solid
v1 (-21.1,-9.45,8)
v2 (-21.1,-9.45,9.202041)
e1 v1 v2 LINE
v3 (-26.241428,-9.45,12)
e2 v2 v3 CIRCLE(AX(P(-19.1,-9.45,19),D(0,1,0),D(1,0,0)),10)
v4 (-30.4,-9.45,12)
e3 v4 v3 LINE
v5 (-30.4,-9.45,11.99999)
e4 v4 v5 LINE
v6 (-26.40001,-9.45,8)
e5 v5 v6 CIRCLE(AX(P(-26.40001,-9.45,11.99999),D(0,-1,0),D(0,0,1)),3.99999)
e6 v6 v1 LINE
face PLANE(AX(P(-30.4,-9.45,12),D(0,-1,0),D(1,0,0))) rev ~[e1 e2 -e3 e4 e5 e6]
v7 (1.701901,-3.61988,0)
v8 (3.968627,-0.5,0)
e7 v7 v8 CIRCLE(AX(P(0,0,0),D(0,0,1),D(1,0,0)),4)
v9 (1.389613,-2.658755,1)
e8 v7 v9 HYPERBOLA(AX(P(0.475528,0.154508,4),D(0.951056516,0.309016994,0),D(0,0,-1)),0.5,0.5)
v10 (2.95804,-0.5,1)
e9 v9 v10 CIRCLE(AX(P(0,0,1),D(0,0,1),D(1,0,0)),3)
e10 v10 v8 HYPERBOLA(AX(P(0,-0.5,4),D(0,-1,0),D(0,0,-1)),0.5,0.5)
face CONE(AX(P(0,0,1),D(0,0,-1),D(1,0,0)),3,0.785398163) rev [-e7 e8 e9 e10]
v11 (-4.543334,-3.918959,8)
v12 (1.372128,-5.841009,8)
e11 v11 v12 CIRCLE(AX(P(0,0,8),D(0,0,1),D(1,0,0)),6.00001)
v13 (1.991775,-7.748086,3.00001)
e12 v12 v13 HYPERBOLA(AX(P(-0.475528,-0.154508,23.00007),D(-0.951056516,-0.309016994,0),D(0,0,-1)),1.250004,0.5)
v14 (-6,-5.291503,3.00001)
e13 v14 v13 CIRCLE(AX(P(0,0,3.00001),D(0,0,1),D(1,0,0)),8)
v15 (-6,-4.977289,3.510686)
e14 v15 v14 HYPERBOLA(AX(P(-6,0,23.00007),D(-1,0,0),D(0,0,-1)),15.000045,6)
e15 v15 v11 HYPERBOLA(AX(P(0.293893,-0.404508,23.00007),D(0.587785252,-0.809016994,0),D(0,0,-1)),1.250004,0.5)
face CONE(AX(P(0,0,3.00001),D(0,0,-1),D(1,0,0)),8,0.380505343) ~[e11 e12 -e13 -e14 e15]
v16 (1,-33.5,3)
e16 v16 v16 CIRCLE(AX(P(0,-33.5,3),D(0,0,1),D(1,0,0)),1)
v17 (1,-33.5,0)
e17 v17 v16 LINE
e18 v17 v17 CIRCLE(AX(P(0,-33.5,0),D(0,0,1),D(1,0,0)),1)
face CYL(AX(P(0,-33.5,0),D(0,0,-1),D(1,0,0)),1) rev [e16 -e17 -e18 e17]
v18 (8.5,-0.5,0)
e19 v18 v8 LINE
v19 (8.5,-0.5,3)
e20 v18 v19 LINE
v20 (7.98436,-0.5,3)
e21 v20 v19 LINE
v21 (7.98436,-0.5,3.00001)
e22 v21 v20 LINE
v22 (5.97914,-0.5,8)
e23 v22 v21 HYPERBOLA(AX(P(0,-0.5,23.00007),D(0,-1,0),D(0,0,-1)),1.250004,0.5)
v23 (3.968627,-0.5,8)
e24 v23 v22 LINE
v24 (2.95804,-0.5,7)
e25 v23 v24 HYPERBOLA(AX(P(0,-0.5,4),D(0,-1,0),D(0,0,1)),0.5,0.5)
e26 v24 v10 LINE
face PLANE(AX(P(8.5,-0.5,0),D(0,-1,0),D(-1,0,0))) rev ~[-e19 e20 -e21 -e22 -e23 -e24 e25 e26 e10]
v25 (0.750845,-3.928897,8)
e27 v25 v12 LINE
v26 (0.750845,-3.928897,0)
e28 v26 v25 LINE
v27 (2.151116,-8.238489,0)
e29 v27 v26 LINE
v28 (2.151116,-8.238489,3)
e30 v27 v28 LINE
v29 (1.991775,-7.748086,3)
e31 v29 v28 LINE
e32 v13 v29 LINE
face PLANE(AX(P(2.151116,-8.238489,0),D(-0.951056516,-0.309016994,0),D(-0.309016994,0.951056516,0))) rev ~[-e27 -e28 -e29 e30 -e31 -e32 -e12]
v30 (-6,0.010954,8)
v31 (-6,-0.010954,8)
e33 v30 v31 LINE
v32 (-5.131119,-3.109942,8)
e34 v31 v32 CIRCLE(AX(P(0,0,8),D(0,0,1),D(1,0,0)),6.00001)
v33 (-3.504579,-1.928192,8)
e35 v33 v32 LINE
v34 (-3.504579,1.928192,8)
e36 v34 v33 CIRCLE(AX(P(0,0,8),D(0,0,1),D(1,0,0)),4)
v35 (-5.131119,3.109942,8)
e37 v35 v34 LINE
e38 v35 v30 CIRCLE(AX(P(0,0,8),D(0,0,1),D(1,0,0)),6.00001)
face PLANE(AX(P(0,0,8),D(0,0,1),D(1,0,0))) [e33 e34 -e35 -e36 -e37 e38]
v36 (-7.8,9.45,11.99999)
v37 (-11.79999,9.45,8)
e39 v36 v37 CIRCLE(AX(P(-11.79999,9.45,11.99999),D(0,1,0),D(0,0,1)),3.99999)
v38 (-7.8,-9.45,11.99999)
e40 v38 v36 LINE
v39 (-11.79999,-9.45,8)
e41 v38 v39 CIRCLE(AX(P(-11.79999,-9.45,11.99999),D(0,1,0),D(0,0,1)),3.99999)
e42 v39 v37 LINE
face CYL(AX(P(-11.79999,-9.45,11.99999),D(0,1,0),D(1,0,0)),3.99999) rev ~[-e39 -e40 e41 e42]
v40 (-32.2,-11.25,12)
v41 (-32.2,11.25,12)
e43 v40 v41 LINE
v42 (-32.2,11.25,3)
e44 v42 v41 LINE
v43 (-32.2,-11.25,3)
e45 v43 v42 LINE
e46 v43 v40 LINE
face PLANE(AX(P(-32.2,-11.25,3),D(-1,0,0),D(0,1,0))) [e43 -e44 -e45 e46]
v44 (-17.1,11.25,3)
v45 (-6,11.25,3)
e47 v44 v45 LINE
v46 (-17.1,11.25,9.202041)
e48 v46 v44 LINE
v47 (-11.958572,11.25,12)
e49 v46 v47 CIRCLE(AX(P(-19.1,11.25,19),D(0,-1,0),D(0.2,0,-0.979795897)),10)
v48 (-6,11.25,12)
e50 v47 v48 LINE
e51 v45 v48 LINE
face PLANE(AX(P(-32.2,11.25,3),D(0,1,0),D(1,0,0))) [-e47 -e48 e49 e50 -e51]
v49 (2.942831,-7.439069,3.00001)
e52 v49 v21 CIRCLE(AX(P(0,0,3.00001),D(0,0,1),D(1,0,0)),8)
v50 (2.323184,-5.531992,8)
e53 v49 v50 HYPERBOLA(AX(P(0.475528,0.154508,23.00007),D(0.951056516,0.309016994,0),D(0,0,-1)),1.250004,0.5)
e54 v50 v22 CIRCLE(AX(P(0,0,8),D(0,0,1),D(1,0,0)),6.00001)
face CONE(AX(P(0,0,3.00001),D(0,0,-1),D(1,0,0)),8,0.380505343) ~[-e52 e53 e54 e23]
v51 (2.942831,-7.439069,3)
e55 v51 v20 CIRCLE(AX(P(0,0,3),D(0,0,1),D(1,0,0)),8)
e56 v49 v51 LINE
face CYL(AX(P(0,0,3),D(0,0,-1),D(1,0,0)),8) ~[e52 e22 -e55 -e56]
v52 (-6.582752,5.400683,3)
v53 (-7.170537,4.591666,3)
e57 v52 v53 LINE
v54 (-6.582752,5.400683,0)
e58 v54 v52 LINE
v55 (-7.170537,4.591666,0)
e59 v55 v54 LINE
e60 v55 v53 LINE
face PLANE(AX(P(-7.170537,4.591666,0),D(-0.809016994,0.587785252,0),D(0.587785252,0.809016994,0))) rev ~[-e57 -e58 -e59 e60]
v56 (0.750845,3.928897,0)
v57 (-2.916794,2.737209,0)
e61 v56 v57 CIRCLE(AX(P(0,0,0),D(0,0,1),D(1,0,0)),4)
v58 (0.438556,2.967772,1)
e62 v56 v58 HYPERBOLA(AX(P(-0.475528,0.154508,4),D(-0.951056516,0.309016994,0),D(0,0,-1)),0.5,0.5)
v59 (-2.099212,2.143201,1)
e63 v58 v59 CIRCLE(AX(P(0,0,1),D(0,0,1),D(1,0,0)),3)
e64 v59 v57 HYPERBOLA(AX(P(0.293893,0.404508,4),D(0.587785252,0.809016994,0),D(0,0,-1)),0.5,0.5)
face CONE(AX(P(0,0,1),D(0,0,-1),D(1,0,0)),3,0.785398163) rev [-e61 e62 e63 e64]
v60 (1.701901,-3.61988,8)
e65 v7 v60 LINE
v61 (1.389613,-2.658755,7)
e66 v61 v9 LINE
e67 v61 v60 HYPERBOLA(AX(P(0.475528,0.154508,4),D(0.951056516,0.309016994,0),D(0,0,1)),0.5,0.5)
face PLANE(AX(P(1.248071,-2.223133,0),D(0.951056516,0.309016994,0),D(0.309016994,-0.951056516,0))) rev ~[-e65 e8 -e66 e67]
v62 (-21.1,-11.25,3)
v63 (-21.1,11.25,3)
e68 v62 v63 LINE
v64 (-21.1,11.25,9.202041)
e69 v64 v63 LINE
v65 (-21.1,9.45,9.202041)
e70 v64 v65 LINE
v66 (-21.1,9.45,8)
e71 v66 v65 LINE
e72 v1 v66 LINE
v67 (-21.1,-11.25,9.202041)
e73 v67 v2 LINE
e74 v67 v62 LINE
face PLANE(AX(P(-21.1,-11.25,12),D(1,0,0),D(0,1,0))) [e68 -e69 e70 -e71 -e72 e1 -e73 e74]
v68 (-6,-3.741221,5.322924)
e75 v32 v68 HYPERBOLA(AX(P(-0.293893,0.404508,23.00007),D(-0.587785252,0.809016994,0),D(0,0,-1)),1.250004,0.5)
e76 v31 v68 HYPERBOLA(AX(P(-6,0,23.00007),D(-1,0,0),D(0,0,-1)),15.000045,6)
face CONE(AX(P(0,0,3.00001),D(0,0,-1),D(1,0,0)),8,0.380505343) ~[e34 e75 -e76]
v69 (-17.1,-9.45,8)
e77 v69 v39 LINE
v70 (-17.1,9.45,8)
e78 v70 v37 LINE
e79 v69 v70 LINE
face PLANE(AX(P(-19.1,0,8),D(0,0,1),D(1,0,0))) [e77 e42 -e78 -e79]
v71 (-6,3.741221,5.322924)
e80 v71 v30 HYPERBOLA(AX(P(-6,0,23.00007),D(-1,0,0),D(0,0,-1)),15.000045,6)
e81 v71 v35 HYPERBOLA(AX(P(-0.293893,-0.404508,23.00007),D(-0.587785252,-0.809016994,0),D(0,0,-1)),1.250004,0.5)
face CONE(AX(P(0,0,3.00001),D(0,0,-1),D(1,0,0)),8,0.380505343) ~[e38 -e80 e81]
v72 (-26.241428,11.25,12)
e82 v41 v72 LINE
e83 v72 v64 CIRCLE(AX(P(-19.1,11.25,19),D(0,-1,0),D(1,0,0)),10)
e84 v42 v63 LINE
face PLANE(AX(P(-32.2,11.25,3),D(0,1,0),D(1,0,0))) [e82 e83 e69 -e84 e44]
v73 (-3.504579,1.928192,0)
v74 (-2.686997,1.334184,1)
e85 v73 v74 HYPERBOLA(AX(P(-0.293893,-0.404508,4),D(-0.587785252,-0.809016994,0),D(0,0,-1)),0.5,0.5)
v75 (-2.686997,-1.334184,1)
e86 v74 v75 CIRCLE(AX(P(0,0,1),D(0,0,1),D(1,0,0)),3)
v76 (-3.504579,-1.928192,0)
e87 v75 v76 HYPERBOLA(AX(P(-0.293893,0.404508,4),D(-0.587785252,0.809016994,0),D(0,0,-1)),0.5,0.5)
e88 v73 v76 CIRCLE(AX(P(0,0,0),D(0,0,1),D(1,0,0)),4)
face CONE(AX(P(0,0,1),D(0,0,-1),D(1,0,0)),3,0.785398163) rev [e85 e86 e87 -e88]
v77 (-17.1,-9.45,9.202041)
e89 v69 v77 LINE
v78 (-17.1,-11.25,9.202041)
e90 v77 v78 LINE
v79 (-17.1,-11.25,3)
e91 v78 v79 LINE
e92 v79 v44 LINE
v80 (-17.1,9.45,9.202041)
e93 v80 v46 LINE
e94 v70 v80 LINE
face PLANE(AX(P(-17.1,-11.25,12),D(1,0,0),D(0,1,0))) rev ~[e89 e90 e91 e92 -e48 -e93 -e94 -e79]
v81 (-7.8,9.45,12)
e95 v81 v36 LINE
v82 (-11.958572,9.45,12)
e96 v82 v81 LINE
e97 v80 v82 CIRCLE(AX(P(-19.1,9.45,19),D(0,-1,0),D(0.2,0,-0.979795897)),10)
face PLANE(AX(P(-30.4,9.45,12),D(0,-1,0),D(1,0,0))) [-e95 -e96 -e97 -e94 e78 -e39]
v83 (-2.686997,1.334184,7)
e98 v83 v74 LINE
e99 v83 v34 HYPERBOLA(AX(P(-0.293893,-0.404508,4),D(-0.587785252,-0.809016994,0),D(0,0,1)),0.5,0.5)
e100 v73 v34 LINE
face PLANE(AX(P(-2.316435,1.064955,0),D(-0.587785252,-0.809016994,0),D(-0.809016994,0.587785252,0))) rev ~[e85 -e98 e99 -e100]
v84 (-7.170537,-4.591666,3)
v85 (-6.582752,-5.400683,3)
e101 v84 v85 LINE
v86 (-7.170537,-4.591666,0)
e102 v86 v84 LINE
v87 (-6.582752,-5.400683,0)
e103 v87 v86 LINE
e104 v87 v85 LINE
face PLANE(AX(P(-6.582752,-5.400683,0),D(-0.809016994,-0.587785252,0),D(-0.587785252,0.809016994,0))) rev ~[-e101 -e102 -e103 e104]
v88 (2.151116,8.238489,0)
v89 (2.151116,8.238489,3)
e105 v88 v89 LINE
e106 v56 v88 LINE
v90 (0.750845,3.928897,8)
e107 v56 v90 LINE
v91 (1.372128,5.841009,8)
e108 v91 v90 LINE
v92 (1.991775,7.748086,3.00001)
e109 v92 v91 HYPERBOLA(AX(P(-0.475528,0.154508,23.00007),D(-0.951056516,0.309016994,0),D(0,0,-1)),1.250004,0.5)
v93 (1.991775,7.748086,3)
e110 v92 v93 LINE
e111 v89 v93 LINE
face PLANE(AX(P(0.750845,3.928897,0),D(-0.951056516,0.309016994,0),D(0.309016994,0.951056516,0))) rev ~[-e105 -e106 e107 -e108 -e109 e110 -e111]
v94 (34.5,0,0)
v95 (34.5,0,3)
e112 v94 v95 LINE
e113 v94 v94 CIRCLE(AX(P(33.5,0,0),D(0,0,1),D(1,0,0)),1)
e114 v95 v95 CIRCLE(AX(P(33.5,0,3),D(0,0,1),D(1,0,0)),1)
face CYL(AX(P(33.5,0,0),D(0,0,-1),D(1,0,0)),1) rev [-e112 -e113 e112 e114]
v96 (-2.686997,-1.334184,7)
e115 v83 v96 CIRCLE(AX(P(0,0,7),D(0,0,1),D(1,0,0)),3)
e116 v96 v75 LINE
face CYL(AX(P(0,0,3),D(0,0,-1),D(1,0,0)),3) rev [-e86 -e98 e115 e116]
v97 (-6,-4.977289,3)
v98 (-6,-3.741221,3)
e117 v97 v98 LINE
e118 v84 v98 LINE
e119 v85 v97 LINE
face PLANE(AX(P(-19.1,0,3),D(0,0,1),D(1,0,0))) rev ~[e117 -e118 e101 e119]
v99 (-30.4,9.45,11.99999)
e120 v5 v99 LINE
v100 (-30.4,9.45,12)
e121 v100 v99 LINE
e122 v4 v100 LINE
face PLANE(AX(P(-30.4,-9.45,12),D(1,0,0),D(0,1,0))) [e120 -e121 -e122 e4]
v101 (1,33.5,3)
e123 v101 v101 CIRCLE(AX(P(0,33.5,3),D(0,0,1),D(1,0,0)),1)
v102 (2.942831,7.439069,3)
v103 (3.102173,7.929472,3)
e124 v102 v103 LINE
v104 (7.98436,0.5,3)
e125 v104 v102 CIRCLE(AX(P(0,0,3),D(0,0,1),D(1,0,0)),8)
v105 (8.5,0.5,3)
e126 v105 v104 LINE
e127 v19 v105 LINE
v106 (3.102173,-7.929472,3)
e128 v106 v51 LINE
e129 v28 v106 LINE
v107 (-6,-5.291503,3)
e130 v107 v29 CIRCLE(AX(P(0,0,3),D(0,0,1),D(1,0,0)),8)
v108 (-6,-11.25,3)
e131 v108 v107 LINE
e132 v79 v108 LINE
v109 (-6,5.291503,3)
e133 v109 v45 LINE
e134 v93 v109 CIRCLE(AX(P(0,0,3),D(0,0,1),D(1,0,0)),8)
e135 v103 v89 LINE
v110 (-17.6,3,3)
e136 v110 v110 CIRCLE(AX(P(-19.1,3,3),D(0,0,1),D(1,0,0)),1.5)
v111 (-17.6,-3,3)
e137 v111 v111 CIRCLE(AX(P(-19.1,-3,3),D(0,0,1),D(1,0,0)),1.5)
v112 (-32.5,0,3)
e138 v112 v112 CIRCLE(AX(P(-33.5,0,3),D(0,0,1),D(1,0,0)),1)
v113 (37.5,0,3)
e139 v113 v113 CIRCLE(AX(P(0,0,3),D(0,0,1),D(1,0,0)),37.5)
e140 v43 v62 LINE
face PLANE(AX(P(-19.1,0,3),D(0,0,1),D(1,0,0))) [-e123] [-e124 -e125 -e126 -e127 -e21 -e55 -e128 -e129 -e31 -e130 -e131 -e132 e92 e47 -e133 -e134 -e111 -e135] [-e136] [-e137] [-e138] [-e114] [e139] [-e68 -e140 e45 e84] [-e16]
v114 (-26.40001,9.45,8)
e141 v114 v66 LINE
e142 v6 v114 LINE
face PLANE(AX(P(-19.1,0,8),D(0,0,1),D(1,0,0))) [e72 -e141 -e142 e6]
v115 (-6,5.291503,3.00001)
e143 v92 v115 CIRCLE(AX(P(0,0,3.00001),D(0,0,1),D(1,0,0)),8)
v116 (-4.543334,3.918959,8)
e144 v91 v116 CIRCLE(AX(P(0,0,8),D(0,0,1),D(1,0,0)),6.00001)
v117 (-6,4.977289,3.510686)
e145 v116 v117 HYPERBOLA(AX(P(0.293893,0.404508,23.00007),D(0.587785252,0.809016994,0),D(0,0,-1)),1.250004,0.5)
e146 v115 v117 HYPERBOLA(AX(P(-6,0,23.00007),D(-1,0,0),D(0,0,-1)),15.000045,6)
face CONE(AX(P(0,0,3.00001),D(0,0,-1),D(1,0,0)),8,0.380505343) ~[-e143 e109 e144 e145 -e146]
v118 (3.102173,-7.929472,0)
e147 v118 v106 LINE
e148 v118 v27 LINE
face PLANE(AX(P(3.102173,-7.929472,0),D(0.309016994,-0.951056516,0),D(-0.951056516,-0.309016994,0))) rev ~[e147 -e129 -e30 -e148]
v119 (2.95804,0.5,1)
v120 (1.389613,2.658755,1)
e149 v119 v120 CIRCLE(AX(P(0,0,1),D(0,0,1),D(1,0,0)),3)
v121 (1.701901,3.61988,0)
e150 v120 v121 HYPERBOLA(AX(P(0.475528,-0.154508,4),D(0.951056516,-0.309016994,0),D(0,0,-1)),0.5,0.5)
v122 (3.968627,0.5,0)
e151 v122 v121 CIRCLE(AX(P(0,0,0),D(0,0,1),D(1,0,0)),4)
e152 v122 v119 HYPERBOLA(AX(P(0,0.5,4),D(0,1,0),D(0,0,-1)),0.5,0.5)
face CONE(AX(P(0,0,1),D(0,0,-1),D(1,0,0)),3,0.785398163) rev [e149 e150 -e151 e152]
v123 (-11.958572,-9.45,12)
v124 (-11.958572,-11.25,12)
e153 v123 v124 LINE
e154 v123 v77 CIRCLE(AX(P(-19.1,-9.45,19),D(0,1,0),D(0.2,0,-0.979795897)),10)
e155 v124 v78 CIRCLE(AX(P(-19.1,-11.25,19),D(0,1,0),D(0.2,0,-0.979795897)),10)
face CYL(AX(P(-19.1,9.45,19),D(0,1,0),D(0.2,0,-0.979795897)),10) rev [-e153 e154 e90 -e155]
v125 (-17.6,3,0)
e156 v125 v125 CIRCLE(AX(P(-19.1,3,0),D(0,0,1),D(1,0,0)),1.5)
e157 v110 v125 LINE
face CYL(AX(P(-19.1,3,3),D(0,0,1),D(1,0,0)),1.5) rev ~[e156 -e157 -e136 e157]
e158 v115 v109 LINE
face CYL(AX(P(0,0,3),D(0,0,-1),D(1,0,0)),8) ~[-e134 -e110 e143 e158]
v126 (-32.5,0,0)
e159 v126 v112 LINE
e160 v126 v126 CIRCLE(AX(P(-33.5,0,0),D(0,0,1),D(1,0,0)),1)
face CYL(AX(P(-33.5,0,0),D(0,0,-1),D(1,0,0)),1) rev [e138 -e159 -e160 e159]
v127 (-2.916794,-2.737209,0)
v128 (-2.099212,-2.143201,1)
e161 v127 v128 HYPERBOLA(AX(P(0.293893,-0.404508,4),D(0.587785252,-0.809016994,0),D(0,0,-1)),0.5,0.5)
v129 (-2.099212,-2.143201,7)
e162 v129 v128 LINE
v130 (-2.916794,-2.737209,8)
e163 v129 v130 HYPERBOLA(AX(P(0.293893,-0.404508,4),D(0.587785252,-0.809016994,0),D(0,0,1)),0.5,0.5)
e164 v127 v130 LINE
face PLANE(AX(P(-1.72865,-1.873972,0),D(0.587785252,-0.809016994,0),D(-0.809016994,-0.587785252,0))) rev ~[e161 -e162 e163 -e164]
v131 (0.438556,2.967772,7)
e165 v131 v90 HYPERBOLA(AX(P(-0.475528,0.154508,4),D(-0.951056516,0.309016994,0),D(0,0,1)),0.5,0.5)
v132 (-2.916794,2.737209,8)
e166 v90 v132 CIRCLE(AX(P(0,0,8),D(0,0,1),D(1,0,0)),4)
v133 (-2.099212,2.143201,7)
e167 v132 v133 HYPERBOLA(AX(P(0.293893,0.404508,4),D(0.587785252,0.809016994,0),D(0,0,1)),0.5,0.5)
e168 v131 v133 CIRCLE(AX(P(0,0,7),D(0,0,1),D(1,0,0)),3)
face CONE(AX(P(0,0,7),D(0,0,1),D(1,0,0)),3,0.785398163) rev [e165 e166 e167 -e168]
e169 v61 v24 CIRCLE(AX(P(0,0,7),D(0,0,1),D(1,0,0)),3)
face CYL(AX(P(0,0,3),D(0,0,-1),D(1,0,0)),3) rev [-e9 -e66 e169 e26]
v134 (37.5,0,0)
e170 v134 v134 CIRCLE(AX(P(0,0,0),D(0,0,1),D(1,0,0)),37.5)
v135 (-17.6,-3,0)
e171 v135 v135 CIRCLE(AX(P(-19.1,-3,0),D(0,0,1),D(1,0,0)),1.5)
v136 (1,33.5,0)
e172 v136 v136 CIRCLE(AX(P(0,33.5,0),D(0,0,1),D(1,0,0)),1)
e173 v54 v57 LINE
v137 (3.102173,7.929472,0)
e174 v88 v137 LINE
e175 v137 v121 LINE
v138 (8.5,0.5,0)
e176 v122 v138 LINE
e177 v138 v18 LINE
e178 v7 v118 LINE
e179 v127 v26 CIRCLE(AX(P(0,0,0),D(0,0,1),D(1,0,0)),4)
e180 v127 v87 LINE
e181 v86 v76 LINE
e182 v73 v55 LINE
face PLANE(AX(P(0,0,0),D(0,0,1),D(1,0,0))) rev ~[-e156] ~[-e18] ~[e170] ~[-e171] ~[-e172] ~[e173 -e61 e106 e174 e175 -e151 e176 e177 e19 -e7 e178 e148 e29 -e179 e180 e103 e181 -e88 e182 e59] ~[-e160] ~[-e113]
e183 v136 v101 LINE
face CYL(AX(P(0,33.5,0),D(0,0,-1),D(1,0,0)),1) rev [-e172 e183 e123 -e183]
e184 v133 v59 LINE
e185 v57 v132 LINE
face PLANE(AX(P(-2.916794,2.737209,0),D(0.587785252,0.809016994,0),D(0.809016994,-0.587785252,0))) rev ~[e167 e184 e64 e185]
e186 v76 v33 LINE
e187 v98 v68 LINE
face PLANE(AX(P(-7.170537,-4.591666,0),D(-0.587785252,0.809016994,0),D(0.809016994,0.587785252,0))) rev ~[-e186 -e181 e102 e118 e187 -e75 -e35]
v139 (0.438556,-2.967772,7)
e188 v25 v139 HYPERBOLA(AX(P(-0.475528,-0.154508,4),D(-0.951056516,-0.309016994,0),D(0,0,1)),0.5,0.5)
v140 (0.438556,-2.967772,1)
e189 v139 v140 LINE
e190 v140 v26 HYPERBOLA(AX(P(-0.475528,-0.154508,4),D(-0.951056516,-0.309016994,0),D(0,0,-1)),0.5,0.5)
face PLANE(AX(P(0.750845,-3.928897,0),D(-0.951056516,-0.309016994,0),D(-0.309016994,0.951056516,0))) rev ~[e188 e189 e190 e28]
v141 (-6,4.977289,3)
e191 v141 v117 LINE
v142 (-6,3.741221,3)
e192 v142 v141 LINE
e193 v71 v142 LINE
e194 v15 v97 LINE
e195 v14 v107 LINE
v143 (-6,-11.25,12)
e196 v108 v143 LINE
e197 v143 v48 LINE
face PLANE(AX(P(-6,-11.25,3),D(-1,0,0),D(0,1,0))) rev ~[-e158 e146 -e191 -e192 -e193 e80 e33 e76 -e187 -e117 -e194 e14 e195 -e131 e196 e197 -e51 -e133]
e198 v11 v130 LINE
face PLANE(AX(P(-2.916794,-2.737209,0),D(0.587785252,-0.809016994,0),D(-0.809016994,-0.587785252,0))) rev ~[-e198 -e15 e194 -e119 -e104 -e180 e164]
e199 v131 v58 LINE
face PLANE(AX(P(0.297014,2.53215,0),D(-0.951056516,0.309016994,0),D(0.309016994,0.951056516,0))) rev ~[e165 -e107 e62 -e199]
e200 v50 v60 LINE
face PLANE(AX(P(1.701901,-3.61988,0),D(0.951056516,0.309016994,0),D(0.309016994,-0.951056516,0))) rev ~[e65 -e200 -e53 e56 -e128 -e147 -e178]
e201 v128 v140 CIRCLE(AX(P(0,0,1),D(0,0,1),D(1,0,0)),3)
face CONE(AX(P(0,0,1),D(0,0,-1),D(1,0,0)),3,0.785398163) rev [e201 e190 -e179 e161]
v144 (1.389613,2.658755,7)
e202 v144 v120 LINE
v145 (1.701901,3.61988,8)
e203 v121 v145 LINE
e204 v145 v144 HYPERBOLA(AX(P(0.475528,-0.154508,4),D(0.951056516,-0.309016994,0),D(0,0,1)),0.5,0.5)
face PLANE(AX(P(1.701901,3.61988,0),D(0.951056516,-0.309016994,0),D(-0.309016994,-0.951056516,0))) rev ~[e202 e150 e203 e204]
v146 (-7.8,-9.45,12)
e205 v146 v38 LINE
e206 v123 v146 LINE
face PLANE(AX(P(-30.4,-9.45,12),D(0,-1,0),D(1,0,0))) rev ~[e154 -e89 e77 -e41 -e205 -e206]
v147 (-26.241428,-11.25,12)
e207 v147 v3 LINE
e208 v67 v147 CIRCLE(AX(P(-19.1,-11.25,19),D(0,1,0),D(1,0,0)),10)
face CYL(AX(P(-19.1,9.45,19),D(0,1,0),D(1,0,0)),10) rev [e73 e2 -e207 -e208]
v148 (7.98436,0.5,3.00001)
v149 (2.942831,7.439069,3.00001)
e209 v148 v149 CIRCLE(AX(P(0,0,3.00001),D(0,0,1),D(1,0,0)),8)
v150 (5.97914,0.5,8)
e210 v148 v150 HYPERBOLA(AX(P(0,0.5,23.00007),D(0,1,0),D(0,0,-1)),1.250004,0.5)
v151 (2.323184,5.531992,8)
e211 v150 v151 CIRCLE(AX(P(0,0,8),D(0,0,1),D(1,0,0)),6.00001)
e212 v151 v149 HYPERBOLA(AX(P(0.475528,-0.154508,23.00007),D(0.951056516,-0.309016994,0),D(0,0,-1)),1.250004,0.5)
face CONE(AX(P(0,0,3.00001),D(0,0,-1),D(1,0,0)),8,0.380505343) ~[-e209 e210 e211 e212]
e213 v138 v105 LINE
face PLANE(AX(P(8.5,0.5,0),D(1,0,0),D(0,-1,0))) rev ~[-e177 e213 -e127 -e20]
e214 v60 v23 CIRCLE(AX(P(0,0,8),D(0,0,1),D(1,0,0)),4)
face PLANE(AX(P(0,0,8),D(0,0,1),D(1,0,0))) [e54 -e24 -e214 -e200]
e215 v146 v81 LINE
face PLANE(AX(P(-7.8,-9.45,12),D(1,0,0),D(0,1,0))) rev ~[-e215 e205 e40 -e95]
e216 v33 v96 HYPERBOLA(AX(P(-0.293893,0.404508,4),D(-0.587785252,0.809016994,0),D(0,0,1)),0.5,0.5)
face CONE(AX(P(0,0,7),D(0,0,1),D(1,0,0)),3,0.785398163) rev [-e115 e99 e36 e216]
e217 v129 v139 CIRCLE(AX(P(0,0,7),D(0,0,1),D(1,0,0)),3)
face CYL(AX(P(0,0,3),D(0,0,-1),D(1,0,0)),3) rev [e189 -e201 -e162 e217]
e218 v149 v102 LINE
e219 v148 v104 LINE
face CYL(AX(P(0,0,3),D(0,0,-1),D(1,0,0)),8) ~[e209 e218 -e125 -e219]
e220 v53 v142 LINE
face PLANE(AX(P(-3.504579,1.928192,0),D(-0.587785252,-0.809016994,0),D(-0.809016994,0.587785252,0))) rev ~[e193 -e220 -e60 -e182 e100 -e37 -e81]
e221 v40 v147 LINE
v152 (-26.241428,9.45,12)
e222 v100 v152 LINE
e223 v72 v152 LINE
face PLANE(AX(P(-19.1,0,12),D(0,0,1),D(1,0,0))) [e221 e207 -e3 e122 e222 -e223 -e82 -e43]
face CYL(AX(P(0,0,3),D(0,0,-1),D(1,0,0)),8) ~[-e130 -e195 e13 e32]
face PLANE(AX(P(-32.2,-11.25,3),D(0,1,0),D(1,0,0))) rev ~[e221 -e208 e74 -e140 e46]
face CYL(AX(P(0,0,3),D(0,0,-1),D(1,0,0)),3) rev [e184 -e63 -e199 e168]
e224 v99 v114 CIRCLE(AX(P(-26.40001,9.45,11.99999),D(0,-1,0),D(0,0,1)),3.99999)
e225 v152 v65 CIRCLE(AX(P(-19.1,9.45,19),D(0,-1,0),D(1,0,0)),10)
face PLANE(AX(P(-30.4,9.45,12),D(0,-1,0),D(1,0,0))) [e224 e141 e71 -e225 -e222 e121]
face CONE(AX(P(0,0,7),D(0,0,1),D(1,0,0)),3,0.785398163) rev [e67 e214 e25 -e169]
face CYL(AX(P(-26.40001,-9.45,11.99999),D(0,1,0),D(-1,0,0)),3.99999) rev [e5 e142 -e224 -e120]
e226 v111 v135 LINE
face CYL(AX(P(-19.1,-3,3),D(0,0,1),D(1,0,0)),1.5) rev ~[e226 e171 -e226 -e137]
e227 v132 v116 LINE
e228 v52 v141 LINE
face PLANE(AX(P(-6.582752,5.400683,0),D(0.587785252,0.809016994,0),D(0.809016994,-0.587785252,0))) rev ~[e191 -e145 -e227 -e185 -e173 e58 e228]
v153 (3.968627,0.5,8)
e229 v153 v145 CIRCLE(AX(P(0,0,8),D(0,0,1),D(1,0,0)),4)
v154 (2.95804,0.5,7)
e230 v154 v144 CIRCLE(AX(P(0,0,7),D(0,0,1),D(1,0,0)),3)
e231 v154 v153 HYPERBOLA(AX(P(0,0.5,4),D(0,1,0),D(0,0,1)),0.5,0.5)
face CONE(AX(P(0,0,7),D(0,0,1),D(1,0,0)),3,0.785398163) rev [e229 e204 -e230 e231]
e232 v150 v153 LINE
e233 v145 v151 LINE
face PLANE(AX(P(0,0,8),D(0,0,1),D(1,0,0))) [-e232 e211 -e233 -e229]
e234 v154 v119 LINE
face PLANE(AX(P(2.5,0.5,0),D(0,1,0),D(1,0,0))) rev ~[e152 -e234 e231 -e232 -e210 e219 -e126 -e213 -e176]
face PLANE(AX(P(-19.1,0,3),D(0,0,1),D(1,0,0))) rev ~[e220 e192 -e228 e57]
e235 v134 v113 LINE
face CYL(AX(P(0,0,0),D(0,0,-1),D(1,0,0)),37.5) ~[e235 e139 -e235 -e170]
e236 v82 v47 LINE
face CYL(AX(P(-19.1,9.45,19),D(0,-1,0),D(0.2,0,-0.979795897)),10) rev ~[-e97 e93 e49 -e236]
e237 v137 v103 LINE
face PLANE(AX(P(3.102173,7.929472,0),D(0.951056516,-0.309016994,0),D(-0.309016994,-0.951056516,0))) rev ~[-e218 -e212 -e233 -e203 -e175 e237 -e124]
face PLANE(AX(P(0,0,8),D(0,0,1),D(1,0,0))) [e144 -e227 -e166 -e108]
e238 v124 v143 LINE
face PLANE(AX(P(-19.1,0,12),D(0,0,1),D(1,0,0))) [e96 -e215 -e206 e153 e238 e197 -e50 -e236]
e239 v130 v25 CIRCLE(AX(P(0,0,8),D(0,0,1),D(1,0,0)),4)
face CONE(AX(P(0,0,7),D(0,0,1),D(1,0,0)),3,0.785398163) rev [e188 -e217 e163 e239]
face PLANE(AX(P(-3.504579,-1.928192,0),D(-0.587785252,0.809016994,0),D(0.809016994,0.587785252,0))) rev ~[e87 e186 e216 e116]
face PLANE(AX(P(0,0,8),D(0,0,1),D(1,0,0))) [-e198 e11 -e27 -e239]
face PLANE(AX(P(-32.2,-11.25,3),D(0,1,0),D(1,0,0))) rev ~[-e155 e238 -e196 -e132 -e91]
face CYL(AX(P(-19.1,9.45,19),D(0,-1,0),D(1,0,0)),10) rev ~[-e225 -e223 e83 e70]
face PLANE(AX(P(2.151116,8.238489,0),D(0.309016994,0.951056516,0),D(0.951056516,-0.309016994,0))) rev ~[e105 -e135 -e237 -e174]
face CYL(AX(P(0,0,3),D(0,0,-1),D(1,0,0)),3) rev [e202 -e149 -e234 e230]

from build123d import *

# Parameters (mm, degrees)
F0_R      = 37.5
F0_R_2    = 1
F0_R_3    = 3
F1_DEPTH  = 3
F2_R      = 8
F2_R_2    = 3
F3_DEPTH  = 5
F4_SIZE2  = 4.99999
F4_SIZE   = 1.99999
F5_SIZE   = 1
F7_DEPTH  = 8.001
F8_R      = 1.5
F9_DEPTH  = 3.001
F10_W     = 26.2
F10_H     = 22.5
F11_DEPTH = 9
F12_W     = 22.6
F12_H     = 18.9
F13_DEPTH = 4
F14_R     = 3.99999
F15_W     = 4
F15_H     = 22.5
F16_DEPTH = 9
F18_DEPTH = 25


# Not quite as in the source:
# - a fillet or chamfer is up to 0.001 mm smaller than in the source, because OpenCascade refuses the exact size


with BuildPart() as f1:
    # F0 (on Top) → F1 (new body)
    with BuildSketch(Plane.XY):
        Circle(F0_R)
        with Locations((0, -33.5)):
            Circle(F0_R_2, mode=Mode.SUBTRACT)
        with Locations((-33.5, 0)):
            Circle(F0_R_2, mode=Mode.SUBTRACT)
        Circle(F0_R_3, mode=Mode.SUBTRACT)
        with Locations((33.5, 0)):
            Circle(F0_R_2, mode=Mode.SUBTRACT)
        with Locations((0, 33.5)):
            Circle(F0_R_2, mode=Mode.SUBTRACT)
    extrude(amount=F1_DEPTH)

    # F2 (on face) → F3 (join)
    with BuildSketch(Plane.XY.offset(3)):
        Circle(F2_R)
        Circle(F2_R_2, mode=Mode.SUBTRACT)
    extrude(amount=F3_DEPTH)

    # F4 (size 2 and 5 in the source; OpenCascade refuses exactly that, so slightly less here)
    f4_edges = [f1.edges().sort_by_distance(p)[0] for p in [
        (-8, 0, 8),
    ]]
    f4_side = f1.faces().sort_by_distance((-7.773726, 0, 8))[0]
    chamfer(f4_edges, length=F4_SIZE, length2=F4_SIZE2, reference=f4_side)

    # F5
    f5_edges = [f1.edges().sort_by_distance(p)[0] for p in [
        (-3, 0, 0),
        (3, 0, 4),
        (-3, 0, 8),
    ]]
    chamfer(f5_edges, length=F5_SIZE)

    # F6 (on face) → F7 (cut, through all)
    with BuildSketch(Plane(origin=(0, 0, 0), x_dir=(1, 0, 0), z_dir=(0, 0, -1))):
        with BuildLine():
            Line((-1.7286498598, 1.8739716279), (-2.9167940342, 2.7372089))
            ThreePointArc((-2.9167940342, 2.7372089), (-3.2360679775, 2.3511410092), (-3.5045792865, 1.9281919056))
            Line((-3.5045792865, 1.9281919056), (-2.3164351121, 1.0649546335))
            Line((-2.3164351121, 1.0649546335), (-1.7286498598, 1.8739716279))
        make_face()
        with BuildLine():
            Line((1.2480707441, 2.2231327936), (1.7019014352, 3.6198800401))
            ThreePointArc((1.7019014352, 3.6198800401), (1.2360679775, 3.8042260652), (0.7508449189, 3.9288970345))
            Line((0.7508449189, 3.9288970345), (0.2970142278, 2.5321497879))
            Line((0.2970142278, 2.5321497879), (1.2480707441, 2.2231327936))
        make_face()
        with BuildLine():
            ThreePointArc((0.7508449189, 3.9288970345), (1.2360679775, 3.8042260652), (1.7019014352, 3.6198800401))
            Line((1.7019014352, 3.6198800401), (3.1021727103, 7.9294718913))
            Line((3.1021727103, 7.9294718913), (2.151116194, 8.2384888857))
            Line((2.151116194, 8.2384888857), (0.7508449189, 3.9288970345))
        make_face()
        with BuildLine():
            Line((8.5, -0.5), (8.5, 0.5))
            Line((8.5, 0.5), (3.9686269666, 0.5))
            ThreePointArc((3.9686269666, 0.5), (3.9921490369, 0.2504916502), (4, 0))
            ThreePointArc((4, 0), (3.9921490369, -0.2504916502), (3.9686269666, -0.5))
            Line((3.9686269666, -0.5), (8.5, -0.5))
        make_face()
        with BuildLine():
            Line((3.1021727103, -7.9294718913), (1.7019014352, -3.6198800401))
            ThreePointArc((1.7019014352, -3.6198800401), (1.2360679775, -3.8042260652), (0.7508449189, -3.9288970345))
            Line((0.7508449189, -3.9288970345), (2.151116194, -8.2384888857))
            Line((2.151116194, -8.2384888857), (3.1021727103, -7.9294718913))
        make_face()
        with BuildLine():
            ThreePointArc((4, 0), (3.9921490369, 0.2504916502), (3.9686269666, 0.5))
            Line((3.9686269666, 0.5), (2.5, 0.5))
            Line((2.5, 0.5), (2.5, -0.5))
            Line((2.5, -0.5), (3.9686269666, -0.5))
            ThreePointArc((3.9686269666, -0.5), (3.9921490369, -0.2504916502), (4, 0))
        make_face()
        with BuildLine():
            ThreePointArc((0.7508449189, -3.9288970345), (1.2360679775, -3.8042260652), (1.7019014352, -3.6198800401))
            Line((1.7019014352, -3.6198800401), (1.2480707441, -2.2231327936))
            Line((1.2480707441, -2.2231327936), (0.2970142278, -2.5321497879))
            Line((0.2970142278, -2.5321497879), (0.7508449189, -3.9288970345))
        make_face()
        with BuildLine():
            Line((-6.582751826, -5.4006831417), (-2.9167940342, -2.7372089))
            ThreePointArc((-2.9167940342, -2.7372089), (-3.2360679775, -2.3511410092), (-3.5045792865, -1.9281919056))
            Line((-3.5045792865, -1.9281919056), (-7.1705370783, -4.5916661473))
            Line((-7.1705370783, -4.5916661473), (-6.582751826, -5.4006831417))
        make_face()
        with BuildLine():
            ThreePointArc((-3.5045792865, -1.9281919056), (-3.2360679775, -2.3511410092), (-2.9167940342, -2.7372089))
            Line((-2.9167940342, -2.7372089), (-1.7286498598, -1.8739716279))
            Line((-1.7286498598, -1.8739716279), (-2.3164351121, -1.0649546335))
            Line((-2.3164351121, -1.0649546335), (-3.5045792865, -1.9281919056))
        make_face()
        with BuildLine():
            ThreePointArc((-3.5045792865, 1.9281919056), (-3.2360679775, 2.3511410092), (-2.9167940342, 2.7372089))
            Line((-2.9167940342, 2.7372089), (-6.582751826, 5.4006831417))
            Line((-6.582751826, 5.4006831417), (-7.1705370783, 4.5916661473))
            Line((-7.1705370783, 4.5916661473), (-3.5045792865, 1.9281919056))
        make_face()
    extrude(amount=-F7_DEPTH, mode=Mode.SUBTRACT)

    # F8 (on face) → F9 (cut, through all)
    with BuildSketch(Plane.XY.offset(3)):
        with Locations((-19.1, 3)):
            Circle(F8_R)
        with Locations((-19.1, -3)):
            Circle(F8_R)
    extrude(amount=-F9_DEPTH, mode=Mode.SUBTRACT)

    # F10 (on face) → F11 (join)
    with BuildSketch(Plane.XY.offset(3)):
        with Locations((-19.1, 0)):
            Rectangle(F10_W, F10_H)
    extrude(amount=F11_DEPTH)

    # F12 (on face) → F13 (cut)
    with BuildSketch(Plane.XY.offset(12)):
        with Locations((-19.1, 0)):
            Rectangle(F12_W, F12_H)
    extrude(amount=-F13_DEPTH, mode=Mode.SUBTRACT)

    # F14 (radius 4 in the source; OpenCascade refuses exactly that, so slightly less here)
    f14_edges = [f1.edges().sort_by_distance(p)[0] for p in [
        (-30.4, 0, 8),
        (-7.8, 0, 8),
    ]]
    fillet(f14_edges, radius=F14_R)

    # F15 (on face) → F16 (cut, through all)
    with BuildSketch(Plane.XY.offset(12)):
        with Locations((-19.1, 0)):
            Rectangle(F15_W, F15_H)
    extrude(amount=-F16_DEPTH, mode=Mode.SUBTRACT)

    # F17 (on face) → F18 (cut, symmetric)
    with BuildSketch(Plane.XZ.offset(-9.45)):
        with BuildLine():
            ThreePointArc((-11.9585715715, 12), (-9.8421848073, 15.2194103823), (-9.1, 19))
            ThreePointArc((-9.1, 19), (-26.8459666924, 25.3245553203), (-17.1, 9.2020410289))
            Line((-17.1, 9.2020410289), (-17.1, 12))
            Line((-17.1, 12), (-11.9585715715, 12))
        make_face()
        with BuildLine():
            Line((-17.1, 12), (-17.1, 9.2020410289))
            ThreePointArc((-17.1, 9.2020410289), (-14.3199820053, 10.2164114412), (-11.9585715715, 12))
            Line((-11.9585715715, 12), (-17.1, 12))
        make_face()
    extrude(amount=F18_DEPTH, both=True, mode=Mode.SUBTRACT)


solid = f1.part
